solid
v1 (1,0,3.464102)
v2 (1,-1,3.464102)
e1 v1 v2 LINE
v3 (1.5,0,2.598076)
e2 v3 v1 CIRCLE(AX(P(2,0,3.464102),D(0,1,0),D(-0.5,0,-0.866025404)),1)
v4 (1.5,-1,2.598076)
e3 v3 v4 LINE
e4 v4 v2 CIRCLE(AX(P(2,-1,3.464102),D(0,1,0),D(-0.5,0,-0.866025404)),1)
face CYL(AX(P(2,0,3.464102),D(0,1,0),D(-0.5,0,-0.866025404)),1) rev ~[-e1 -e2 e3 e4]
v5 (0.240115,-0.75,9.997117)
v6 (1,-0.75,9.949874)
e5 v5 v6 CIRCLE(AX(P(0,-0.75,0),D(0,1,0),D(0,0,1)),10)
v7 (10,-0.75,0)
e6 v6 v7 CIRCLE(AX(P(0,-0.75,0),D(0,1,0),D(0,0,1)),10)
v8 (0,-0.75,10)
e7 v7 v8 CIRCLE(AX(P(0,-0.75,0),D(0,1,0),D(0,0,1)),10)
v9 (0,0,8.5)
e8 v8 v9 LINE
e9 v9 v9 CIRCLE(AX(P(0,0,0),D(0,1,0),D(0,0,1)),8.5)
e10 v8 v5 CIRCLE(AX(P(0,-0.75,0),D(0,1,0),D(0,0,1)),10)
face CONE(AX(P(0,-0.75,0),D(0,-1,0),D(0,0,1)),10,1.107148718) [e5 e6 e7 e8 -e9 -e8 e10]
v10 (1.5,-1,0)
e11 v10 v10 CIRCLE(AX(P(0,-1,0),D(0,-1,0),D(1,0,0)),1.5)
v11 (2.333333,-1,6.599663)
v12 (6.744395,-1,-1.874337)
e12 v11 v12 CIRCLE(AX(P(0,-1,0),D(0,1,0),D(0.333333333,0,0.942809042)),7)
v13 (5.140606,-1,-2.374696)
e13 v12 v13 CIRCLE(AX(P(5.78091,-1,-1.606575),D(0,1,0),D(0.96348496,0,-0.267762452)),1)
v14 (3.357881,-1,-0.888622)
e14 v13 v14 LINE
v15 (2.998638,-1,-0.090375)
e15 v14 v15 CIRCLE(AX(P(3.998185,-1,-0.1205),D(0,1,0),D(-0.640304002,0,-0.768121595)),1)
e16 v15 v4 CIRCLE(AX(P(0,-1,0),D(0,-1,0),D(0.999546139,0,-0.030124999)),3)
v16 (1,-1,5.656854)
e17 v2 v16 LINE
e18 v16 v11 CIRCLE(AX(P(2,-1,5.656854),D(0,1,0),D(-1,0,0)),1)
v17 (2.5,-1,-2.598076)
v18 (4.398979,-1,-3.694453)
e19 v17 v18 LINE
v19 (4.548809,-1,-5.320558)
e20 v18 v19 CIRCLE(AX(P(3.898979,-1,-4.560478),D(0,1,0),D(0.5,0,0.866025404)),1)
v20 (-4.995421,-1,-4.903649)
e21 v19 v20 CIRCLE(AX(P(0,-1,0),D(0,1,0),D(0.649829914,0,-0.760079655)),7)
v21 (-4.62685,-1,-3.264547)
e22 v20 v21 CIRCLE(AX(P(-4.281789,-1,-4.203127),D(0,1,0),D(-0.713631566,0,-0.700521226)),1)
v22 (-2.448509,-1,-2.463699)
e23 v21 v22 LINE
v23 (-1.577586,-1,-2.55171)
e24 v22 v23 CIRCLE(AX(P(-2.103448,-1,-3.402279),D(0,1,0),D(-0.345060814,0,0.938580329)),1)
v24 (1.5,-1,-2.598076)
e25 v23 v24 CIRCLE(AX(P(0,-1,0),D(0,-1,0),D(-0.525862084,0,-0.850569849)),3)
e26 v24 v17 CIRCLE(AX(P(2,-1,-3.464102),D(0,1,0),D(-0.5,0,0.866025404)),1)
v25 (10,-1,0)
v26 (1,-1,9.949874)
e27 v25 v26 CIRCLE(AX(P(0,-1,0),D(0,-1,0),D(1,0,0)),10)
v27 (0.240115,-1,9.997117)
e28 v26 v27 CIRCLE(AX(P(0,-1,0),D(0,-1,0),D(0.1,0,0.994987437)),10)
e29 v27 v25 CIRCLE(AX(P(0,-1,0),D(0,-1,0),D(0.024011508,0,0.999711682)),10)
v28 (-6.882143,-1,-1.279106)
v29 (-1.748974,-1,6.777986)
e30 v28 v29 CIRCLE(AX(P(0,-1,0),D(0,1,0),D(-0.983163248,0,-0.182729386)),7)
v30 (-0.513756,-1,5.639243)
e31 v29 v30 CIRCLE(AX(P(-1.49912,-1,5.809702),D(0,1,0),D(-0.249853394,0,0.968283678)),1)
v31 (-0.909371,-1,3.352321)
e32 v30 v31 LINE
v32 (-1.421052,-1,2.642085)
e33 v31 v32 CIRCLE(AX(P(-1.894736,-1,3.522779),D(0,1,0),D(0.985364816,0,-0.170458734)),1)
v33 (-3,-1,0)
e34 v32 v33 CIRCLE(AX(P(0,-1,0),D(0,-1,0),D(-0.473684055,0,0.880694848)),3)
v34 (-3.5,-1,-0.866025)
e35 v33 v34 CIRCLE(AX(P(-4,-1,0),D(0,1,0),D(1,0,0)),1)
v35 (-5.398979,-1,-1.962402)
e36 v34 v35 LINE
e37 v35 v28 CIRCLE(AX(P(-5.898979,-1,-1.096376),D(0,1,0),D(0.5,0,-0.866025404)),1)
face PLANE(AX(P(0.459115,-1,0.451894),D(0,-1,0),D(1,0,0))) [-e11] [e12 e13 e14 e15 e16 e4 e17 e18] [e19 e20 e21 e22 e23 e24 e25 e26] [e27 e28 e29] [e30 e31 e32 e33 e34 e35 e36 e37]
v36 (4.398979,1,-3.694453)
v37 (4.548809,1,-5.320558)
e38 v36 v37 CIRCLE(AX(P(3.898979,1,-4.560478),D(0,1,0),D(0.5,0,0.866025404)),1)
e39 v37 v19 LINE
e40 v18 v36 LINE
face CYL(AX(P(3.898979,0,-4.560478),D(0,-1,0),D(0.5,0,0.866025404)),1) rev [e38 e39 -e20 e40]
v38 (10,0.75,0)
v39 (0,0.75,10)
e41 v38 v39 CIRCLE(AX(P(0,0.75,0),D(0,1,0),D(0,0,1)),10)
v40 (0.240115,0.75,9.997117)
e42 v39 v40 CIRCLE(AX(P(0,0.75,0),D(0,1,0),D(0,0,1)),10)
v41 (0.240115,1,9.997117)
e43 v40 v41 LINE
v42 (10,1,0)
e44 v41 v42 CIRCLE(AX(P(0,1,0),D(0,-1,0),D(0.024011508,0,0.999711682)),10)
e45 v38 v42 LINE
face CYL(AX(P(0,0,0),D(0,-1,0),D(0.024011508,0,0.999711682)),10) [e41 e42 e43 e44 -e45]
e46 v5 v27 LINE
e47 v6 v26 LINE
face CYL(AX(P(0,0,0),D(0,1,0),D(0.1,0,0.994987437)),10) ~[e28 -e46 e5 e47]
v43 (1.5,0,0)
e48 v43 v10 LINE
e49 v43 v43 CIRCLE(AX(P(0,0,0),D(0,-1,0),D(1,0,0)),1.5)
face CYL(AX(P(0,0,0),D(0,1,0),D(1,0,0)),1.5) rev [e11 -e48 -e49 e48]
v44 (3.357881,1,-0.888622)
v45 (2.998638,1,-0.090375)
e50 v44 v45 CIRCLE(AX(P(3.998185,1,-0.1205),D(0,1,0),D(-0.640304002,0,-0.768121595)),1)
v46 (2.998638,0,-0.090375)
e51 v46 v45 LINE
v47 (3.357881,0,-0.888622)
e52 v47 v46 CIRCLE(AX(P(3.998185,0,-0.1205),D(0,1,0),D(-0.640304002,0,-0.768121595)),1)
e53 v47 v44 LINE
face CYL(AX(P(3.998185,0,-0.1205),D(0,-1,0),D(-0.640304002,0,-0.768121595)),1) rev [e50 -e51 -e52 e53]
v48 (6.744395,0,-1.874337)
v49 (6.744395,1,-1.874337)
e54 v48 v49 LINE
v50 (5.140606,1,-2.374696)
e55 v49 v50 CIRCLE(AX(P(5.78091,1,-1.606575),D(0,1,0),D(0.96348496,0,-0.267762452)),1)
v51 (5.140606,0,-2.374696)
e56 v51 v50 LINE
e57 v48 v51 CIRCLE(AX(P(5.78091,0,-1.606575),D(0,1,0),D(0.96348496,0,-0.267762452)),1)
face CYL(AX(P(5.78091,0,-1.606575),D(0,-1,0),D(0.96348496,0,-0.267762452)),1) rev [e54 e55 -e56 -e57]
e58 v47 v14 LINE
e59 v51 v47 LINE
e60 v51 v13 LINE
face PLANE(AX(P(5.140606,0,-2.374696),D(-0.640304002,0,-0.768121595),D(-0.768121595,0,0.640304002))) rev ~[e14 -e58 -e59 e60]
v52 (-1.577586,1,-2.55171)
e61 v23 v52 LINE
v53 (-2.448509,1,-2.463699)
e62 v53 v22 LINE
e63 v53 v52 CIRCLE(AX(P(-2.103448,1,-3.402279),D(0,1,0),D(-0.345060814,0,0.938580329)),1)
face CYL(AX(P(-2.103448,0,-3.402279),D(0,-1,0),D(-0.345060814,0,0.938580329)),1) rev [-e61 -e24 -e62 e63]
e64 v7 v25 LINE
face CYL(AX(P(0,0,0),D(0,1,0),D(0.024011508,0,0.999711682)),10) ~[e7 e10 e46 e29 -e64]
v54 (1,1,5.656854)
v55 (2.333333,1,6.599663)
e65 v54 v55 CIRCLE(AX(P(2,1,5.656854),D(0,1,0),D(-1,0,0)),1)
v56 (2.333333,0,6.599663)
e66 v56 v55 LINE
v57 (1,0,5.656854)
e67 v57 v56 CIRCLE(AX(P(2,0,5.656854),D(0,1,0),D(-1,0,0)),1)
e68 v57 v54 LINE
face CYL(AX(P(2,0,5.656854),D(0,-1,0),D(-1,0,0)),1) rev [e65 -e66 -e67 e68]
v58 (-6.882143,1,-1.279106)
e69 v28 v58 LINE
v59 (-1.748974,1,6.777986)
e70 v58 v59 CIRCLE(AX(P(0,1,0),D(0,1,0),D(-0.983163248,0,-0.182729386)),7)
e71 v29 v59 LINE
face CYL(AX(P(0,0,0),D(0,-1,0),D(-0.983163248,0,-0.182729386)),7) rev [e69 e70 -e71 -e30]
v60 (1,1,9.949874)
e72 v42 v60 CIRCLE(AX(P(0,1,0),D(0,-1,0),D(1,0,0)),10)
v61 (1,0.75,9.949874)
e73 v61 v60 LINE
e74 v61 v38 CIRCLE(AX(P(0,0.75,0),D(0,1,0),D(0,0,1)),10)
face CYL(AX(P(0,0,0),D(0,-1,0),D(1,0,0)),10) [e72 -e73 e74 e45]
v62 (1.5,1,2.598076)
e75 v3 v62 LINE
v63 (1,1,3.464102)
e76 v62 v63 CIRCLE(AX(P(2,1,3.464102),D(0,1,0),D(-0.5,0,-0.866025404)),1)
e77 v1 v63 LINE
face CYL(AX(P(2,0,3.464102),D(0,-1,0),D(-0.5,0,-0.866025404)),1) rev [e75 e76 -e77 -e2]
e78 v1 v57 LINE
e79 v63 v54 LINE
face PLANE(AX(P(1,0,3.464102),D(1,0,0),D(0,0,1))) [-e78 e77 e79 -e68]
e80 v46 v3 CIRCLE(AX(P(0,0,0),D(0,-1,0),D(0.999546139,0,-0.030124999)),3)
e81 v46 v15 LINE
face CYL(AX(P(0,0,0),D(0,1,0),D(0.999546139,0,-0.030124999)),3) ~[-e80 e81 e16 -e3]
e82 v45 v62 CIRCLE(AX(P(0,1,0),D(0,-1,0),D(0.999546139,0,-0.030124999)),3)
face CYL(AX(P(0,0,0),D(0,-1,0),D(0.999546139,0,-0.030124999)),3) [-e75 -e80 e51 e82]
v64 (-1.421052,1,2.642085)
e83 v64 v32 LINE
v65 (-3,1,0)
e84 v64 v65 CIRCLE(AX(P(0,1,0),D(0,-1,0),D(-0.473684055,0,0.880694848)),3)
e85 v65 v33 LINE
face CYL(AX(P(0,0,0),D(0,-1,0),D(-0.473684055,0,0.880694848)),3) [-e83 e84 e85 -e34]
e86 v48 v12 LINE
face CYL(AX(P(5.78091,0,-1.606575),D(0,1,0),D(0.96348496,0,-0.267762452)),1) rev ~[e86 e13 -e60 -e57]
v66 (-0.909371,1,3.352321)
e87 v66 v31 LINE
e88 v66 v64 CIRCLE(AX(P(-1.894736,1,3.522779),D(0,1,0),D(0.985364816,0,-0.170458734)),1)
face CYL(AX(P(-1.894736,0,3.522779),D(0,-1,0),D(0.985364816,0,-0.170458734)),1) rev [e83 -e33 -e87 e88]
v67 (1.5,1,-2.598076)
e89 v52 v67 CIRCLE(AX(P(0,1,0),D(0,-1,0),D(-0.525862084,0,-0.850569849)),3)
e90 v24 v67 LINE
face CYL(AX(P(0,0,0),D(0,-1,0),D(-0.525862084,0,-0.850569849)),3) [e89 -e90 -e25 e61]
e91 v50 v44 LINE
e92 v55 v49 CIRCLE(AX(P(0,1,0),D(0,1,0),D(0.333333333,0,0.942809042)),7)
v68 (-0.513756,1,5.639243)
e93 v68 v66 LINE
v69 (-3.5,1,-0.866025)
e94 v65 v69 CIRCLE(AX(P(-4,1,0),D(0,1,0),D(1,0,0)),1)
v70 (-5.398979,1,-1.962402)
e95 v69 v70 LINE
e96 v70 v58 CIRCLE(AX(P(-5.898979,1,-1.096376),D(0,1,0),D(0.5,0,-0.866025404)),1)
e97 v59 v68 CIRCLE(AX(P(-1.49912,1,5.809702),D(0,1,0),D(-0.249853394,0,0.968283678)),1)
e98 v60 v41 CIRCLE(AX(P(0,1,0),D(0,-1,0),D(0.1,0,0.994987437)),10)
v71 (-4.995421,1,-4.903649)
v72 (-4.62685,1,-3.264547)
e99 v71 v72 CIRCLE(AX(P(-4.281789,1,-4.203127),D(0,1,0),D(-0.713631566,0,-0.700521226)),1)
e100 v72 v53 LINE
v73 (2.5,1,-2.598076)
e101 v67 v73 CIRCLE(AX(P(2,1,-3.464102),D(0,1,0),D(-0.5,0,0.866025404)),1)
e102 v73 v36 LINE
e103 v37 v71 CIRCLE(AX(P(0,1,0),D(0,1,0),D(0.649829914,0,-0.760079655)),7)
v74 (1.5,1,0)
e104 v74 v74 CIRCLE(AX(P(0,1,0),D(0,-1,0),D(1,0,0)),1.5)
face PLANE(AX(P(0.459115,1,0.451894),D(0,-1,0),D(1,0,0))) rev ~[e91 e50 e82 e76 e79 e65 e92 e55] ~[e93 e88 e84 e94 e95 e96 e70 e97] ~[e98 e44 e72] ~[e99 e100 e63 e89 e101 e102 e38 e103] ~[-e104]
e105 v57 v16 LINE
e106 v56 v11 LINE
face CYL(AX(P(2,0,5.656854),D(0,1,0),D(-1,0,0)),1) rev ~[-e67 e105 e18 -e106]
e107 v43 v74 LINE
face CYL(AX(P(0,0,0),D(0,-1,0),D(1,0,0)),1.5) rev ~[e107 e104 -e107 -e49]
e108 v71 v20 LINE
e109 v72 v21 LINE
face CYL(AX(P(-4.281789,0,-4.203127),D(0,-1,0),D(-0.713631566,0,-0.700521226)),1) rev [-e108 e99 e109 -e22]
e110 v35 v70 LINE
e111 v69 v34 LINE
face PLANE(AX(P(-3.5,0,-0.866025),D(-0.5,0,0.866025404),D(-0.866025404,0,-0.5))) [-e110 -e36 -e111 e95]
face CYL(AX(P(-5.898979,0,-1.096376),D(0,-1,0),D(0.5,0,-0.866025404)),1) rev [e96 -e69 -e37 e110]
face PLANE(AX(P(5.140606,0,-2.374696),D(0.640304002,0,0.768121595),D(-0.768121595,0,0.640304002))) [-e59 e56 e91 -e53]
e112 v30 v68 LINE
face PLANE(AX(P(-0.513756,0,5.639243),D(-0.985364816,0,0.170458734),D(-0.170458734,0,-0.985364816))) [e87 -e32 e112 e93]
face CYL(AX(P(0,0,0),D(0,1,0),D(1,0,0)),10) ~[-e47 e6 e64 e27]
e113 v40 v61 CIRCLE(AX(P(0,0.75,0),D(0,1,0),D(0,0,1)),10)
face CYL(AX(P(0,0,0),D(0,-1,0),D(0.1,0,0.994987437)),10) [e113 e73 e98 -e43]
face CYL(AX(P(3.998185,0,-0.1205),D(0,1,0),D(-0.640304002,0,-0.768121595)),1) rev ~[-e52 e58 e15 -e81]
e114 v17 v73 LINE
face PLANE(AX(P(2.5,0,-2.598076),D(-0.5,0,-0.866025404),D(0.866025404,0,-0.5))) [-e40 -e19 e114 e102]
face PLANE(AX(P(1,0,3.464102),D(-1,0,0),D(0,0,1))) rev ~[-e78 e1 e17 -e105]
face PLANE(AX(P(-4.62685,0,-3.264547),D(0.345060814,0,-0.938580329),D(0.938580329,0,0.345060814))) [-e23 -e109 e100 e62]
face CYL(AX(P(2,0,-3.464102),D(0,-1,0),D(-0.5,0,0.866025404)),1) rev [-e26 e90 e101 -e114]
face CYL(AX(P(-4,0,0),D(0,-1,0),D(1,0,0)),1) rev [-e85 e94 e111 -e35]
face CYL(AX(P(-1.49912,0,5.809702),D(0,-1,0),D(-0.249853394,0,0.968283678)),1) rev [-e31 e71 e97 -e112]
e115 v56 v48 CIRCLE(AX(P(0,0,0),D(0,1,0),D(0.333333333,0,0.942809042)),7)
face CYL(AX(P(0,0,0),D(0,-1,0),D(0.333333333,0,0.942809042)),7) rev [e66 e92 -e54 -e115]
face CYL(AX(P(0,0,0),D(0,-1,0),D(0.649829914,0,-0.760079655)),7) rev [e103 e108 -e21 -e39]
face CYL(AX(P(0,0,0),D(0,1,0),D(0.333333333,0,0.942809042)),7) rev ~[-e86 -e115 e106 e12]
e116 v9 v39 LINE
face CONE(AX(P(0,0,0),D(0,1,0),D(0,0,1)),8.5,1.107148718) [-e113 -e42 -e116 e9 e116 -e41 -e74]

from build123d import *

# Parameters (mm, degrees)
F0_R     = 1.5
F1_DEPTH = 1


# Not quite as in the source:
# - ends of sketch curves that miss each other by under 0.0002 mm in the source are joined


with BuildPart() as f1:
    # F0 (on Front) → F1 (new body, symmetric)
    with BuildSketch(Plane.XZ):
        with BuildLine():
            ThreePointArc((0.2401150839, 9.9971168217), (-7.1554577365, -6.985658493), (10, 0))
            ThreePointArc((10, 0), (7.4161984871, 6.7082039325), (1, 9.9498743711))
            ThreePointArc((1, 9.9498743711), (0.6205086012, 9.9807298869), (0.2401150839, 9.9971168217))
        make_face()
        with BuildLine():
            ThreePointArc((4.5488093998, -5.3205575877), (-0.3054811817, -6.9933311982), (-4.9954209636, -4.90364858))
            ThreePointArc((-4.9954209636, -4.90364858), (-5.2574280938, -3.9837438223), (-4.6268502112, -3.2645470249))
            Line((-4.6268502112, -3.2645470249), (-2.4485091499, -2.4636990679))
            ThreePointArc((-2.4485091499, -2.4636990679), (-2.0029061262, -2.4073466036), (-1.5775862521, -2.551709548))
            ThreePointArc((-1.5775862521, -2.551709548), (-0.0451926266, -2.9996595851), (1.5, -2.5980762114))
            ThreePointArc((1.5, -2.5980762114), (2, -2.4641016151), (2.5, -2.5980762114))
            Line((2.5, -2.5980762114), (4.3989794856, -3.6944525285))
            ThreePointArc((4.3989794856, -3.6944525285), (4.8947614013, -4.4687262228), (4.5488093998, -5.3205575877))
        make_face(mode=Mode.SUBTRACT)
        with BuildLine():
            ThreePointArc((-0.9093714051, 3.3523206591), (-1.0833702513, 2.9382408884), (-1.4210521656, 2.6420845449))
            ThreePointArc((-1.4210521656, 2.6420845449), (-2.5751850901, 1.5389677552), (-3, 0))
            ThreePointArc((-3, 0), (-3.1339745962, -0.5), (-3.5, -0.8660254038))
            Line((-3.5, -0.8660254038), (-5.3989794856, -1.962401721))
            ThreePointArc((-5.3989794856, -1.962401721), (-6.3174111322, -2.0046246076), (-6.8821427332, -1.2791057034))
            ThreePointArc((-6.8821427332, -1.2791057034), (-5.9036618838, 3.7612200629), (-1.7489737597, 6.7779857471))
            ThreePointArc((-1.7489737597, 6.7779857471), (-0.8213093054, 6.5449381989), (-0.5137555498, 5.6392433348))
            Line((-0.5137555498, 5.6392433348), (-0.9093714051, 3.3523206591))
        make_face(mode=Mode.SUBTRACT)
        Circle(F0_R, mode=Mode.SUBTRACT)
        with BuildLine():
            Line((1, 3.4641016151), (1, 5.6568542495))
            ThreePointArc((1, 5.6568542495), (1.4226497308, 6.4733508304), (2.3333333333, 6.5996632911))
            ThreePointArc((2.3333333333, 6.5996632911), (6.2091430656, 3.2321111353), (6.7443947233, -1.8743371671))
            ThreePointArc((6.7443947233, -1.8743371671), (6.0787373992, -2.5611943766), (5.140605761, -2.3746963099))
            Line((5.140605761, -2.3746963099), (3.357880555, -0.8886215913))
            ThreePointArc((3.357880555, -0.8886215913), (3.0862763775, -0.5308942848), (2.9986384177, -0.090374997))
            ThreePointArc((2.9986384177, -0.090374997), (2.6203777167, 1.4606918299), (1.5, 2.5980762114))
            ThreePointArc((1.5, 2.5980762114), (1.1339745962, 2.9641016151), (1, 3.4641016151))
        make_face(mode=Mode.SUBTRACT)
    extrude(amount=F1_DEPTH, both=True)

    # F2 (on Right) → F3 (revolve, cut)
    with BuildSketch(Plane.YZ):
        Polygon((-0.75, 10), (0, 8.5), (0, 10), align=None)
        Polygon((0, 10), (0, 8.5), (0.75, 10), align=None)
    revolve(axis=Axis((0, 4.7748805955, 0), (0, 1, 0)), mode=Mode.SUBTRACT)


solid = f1.part
